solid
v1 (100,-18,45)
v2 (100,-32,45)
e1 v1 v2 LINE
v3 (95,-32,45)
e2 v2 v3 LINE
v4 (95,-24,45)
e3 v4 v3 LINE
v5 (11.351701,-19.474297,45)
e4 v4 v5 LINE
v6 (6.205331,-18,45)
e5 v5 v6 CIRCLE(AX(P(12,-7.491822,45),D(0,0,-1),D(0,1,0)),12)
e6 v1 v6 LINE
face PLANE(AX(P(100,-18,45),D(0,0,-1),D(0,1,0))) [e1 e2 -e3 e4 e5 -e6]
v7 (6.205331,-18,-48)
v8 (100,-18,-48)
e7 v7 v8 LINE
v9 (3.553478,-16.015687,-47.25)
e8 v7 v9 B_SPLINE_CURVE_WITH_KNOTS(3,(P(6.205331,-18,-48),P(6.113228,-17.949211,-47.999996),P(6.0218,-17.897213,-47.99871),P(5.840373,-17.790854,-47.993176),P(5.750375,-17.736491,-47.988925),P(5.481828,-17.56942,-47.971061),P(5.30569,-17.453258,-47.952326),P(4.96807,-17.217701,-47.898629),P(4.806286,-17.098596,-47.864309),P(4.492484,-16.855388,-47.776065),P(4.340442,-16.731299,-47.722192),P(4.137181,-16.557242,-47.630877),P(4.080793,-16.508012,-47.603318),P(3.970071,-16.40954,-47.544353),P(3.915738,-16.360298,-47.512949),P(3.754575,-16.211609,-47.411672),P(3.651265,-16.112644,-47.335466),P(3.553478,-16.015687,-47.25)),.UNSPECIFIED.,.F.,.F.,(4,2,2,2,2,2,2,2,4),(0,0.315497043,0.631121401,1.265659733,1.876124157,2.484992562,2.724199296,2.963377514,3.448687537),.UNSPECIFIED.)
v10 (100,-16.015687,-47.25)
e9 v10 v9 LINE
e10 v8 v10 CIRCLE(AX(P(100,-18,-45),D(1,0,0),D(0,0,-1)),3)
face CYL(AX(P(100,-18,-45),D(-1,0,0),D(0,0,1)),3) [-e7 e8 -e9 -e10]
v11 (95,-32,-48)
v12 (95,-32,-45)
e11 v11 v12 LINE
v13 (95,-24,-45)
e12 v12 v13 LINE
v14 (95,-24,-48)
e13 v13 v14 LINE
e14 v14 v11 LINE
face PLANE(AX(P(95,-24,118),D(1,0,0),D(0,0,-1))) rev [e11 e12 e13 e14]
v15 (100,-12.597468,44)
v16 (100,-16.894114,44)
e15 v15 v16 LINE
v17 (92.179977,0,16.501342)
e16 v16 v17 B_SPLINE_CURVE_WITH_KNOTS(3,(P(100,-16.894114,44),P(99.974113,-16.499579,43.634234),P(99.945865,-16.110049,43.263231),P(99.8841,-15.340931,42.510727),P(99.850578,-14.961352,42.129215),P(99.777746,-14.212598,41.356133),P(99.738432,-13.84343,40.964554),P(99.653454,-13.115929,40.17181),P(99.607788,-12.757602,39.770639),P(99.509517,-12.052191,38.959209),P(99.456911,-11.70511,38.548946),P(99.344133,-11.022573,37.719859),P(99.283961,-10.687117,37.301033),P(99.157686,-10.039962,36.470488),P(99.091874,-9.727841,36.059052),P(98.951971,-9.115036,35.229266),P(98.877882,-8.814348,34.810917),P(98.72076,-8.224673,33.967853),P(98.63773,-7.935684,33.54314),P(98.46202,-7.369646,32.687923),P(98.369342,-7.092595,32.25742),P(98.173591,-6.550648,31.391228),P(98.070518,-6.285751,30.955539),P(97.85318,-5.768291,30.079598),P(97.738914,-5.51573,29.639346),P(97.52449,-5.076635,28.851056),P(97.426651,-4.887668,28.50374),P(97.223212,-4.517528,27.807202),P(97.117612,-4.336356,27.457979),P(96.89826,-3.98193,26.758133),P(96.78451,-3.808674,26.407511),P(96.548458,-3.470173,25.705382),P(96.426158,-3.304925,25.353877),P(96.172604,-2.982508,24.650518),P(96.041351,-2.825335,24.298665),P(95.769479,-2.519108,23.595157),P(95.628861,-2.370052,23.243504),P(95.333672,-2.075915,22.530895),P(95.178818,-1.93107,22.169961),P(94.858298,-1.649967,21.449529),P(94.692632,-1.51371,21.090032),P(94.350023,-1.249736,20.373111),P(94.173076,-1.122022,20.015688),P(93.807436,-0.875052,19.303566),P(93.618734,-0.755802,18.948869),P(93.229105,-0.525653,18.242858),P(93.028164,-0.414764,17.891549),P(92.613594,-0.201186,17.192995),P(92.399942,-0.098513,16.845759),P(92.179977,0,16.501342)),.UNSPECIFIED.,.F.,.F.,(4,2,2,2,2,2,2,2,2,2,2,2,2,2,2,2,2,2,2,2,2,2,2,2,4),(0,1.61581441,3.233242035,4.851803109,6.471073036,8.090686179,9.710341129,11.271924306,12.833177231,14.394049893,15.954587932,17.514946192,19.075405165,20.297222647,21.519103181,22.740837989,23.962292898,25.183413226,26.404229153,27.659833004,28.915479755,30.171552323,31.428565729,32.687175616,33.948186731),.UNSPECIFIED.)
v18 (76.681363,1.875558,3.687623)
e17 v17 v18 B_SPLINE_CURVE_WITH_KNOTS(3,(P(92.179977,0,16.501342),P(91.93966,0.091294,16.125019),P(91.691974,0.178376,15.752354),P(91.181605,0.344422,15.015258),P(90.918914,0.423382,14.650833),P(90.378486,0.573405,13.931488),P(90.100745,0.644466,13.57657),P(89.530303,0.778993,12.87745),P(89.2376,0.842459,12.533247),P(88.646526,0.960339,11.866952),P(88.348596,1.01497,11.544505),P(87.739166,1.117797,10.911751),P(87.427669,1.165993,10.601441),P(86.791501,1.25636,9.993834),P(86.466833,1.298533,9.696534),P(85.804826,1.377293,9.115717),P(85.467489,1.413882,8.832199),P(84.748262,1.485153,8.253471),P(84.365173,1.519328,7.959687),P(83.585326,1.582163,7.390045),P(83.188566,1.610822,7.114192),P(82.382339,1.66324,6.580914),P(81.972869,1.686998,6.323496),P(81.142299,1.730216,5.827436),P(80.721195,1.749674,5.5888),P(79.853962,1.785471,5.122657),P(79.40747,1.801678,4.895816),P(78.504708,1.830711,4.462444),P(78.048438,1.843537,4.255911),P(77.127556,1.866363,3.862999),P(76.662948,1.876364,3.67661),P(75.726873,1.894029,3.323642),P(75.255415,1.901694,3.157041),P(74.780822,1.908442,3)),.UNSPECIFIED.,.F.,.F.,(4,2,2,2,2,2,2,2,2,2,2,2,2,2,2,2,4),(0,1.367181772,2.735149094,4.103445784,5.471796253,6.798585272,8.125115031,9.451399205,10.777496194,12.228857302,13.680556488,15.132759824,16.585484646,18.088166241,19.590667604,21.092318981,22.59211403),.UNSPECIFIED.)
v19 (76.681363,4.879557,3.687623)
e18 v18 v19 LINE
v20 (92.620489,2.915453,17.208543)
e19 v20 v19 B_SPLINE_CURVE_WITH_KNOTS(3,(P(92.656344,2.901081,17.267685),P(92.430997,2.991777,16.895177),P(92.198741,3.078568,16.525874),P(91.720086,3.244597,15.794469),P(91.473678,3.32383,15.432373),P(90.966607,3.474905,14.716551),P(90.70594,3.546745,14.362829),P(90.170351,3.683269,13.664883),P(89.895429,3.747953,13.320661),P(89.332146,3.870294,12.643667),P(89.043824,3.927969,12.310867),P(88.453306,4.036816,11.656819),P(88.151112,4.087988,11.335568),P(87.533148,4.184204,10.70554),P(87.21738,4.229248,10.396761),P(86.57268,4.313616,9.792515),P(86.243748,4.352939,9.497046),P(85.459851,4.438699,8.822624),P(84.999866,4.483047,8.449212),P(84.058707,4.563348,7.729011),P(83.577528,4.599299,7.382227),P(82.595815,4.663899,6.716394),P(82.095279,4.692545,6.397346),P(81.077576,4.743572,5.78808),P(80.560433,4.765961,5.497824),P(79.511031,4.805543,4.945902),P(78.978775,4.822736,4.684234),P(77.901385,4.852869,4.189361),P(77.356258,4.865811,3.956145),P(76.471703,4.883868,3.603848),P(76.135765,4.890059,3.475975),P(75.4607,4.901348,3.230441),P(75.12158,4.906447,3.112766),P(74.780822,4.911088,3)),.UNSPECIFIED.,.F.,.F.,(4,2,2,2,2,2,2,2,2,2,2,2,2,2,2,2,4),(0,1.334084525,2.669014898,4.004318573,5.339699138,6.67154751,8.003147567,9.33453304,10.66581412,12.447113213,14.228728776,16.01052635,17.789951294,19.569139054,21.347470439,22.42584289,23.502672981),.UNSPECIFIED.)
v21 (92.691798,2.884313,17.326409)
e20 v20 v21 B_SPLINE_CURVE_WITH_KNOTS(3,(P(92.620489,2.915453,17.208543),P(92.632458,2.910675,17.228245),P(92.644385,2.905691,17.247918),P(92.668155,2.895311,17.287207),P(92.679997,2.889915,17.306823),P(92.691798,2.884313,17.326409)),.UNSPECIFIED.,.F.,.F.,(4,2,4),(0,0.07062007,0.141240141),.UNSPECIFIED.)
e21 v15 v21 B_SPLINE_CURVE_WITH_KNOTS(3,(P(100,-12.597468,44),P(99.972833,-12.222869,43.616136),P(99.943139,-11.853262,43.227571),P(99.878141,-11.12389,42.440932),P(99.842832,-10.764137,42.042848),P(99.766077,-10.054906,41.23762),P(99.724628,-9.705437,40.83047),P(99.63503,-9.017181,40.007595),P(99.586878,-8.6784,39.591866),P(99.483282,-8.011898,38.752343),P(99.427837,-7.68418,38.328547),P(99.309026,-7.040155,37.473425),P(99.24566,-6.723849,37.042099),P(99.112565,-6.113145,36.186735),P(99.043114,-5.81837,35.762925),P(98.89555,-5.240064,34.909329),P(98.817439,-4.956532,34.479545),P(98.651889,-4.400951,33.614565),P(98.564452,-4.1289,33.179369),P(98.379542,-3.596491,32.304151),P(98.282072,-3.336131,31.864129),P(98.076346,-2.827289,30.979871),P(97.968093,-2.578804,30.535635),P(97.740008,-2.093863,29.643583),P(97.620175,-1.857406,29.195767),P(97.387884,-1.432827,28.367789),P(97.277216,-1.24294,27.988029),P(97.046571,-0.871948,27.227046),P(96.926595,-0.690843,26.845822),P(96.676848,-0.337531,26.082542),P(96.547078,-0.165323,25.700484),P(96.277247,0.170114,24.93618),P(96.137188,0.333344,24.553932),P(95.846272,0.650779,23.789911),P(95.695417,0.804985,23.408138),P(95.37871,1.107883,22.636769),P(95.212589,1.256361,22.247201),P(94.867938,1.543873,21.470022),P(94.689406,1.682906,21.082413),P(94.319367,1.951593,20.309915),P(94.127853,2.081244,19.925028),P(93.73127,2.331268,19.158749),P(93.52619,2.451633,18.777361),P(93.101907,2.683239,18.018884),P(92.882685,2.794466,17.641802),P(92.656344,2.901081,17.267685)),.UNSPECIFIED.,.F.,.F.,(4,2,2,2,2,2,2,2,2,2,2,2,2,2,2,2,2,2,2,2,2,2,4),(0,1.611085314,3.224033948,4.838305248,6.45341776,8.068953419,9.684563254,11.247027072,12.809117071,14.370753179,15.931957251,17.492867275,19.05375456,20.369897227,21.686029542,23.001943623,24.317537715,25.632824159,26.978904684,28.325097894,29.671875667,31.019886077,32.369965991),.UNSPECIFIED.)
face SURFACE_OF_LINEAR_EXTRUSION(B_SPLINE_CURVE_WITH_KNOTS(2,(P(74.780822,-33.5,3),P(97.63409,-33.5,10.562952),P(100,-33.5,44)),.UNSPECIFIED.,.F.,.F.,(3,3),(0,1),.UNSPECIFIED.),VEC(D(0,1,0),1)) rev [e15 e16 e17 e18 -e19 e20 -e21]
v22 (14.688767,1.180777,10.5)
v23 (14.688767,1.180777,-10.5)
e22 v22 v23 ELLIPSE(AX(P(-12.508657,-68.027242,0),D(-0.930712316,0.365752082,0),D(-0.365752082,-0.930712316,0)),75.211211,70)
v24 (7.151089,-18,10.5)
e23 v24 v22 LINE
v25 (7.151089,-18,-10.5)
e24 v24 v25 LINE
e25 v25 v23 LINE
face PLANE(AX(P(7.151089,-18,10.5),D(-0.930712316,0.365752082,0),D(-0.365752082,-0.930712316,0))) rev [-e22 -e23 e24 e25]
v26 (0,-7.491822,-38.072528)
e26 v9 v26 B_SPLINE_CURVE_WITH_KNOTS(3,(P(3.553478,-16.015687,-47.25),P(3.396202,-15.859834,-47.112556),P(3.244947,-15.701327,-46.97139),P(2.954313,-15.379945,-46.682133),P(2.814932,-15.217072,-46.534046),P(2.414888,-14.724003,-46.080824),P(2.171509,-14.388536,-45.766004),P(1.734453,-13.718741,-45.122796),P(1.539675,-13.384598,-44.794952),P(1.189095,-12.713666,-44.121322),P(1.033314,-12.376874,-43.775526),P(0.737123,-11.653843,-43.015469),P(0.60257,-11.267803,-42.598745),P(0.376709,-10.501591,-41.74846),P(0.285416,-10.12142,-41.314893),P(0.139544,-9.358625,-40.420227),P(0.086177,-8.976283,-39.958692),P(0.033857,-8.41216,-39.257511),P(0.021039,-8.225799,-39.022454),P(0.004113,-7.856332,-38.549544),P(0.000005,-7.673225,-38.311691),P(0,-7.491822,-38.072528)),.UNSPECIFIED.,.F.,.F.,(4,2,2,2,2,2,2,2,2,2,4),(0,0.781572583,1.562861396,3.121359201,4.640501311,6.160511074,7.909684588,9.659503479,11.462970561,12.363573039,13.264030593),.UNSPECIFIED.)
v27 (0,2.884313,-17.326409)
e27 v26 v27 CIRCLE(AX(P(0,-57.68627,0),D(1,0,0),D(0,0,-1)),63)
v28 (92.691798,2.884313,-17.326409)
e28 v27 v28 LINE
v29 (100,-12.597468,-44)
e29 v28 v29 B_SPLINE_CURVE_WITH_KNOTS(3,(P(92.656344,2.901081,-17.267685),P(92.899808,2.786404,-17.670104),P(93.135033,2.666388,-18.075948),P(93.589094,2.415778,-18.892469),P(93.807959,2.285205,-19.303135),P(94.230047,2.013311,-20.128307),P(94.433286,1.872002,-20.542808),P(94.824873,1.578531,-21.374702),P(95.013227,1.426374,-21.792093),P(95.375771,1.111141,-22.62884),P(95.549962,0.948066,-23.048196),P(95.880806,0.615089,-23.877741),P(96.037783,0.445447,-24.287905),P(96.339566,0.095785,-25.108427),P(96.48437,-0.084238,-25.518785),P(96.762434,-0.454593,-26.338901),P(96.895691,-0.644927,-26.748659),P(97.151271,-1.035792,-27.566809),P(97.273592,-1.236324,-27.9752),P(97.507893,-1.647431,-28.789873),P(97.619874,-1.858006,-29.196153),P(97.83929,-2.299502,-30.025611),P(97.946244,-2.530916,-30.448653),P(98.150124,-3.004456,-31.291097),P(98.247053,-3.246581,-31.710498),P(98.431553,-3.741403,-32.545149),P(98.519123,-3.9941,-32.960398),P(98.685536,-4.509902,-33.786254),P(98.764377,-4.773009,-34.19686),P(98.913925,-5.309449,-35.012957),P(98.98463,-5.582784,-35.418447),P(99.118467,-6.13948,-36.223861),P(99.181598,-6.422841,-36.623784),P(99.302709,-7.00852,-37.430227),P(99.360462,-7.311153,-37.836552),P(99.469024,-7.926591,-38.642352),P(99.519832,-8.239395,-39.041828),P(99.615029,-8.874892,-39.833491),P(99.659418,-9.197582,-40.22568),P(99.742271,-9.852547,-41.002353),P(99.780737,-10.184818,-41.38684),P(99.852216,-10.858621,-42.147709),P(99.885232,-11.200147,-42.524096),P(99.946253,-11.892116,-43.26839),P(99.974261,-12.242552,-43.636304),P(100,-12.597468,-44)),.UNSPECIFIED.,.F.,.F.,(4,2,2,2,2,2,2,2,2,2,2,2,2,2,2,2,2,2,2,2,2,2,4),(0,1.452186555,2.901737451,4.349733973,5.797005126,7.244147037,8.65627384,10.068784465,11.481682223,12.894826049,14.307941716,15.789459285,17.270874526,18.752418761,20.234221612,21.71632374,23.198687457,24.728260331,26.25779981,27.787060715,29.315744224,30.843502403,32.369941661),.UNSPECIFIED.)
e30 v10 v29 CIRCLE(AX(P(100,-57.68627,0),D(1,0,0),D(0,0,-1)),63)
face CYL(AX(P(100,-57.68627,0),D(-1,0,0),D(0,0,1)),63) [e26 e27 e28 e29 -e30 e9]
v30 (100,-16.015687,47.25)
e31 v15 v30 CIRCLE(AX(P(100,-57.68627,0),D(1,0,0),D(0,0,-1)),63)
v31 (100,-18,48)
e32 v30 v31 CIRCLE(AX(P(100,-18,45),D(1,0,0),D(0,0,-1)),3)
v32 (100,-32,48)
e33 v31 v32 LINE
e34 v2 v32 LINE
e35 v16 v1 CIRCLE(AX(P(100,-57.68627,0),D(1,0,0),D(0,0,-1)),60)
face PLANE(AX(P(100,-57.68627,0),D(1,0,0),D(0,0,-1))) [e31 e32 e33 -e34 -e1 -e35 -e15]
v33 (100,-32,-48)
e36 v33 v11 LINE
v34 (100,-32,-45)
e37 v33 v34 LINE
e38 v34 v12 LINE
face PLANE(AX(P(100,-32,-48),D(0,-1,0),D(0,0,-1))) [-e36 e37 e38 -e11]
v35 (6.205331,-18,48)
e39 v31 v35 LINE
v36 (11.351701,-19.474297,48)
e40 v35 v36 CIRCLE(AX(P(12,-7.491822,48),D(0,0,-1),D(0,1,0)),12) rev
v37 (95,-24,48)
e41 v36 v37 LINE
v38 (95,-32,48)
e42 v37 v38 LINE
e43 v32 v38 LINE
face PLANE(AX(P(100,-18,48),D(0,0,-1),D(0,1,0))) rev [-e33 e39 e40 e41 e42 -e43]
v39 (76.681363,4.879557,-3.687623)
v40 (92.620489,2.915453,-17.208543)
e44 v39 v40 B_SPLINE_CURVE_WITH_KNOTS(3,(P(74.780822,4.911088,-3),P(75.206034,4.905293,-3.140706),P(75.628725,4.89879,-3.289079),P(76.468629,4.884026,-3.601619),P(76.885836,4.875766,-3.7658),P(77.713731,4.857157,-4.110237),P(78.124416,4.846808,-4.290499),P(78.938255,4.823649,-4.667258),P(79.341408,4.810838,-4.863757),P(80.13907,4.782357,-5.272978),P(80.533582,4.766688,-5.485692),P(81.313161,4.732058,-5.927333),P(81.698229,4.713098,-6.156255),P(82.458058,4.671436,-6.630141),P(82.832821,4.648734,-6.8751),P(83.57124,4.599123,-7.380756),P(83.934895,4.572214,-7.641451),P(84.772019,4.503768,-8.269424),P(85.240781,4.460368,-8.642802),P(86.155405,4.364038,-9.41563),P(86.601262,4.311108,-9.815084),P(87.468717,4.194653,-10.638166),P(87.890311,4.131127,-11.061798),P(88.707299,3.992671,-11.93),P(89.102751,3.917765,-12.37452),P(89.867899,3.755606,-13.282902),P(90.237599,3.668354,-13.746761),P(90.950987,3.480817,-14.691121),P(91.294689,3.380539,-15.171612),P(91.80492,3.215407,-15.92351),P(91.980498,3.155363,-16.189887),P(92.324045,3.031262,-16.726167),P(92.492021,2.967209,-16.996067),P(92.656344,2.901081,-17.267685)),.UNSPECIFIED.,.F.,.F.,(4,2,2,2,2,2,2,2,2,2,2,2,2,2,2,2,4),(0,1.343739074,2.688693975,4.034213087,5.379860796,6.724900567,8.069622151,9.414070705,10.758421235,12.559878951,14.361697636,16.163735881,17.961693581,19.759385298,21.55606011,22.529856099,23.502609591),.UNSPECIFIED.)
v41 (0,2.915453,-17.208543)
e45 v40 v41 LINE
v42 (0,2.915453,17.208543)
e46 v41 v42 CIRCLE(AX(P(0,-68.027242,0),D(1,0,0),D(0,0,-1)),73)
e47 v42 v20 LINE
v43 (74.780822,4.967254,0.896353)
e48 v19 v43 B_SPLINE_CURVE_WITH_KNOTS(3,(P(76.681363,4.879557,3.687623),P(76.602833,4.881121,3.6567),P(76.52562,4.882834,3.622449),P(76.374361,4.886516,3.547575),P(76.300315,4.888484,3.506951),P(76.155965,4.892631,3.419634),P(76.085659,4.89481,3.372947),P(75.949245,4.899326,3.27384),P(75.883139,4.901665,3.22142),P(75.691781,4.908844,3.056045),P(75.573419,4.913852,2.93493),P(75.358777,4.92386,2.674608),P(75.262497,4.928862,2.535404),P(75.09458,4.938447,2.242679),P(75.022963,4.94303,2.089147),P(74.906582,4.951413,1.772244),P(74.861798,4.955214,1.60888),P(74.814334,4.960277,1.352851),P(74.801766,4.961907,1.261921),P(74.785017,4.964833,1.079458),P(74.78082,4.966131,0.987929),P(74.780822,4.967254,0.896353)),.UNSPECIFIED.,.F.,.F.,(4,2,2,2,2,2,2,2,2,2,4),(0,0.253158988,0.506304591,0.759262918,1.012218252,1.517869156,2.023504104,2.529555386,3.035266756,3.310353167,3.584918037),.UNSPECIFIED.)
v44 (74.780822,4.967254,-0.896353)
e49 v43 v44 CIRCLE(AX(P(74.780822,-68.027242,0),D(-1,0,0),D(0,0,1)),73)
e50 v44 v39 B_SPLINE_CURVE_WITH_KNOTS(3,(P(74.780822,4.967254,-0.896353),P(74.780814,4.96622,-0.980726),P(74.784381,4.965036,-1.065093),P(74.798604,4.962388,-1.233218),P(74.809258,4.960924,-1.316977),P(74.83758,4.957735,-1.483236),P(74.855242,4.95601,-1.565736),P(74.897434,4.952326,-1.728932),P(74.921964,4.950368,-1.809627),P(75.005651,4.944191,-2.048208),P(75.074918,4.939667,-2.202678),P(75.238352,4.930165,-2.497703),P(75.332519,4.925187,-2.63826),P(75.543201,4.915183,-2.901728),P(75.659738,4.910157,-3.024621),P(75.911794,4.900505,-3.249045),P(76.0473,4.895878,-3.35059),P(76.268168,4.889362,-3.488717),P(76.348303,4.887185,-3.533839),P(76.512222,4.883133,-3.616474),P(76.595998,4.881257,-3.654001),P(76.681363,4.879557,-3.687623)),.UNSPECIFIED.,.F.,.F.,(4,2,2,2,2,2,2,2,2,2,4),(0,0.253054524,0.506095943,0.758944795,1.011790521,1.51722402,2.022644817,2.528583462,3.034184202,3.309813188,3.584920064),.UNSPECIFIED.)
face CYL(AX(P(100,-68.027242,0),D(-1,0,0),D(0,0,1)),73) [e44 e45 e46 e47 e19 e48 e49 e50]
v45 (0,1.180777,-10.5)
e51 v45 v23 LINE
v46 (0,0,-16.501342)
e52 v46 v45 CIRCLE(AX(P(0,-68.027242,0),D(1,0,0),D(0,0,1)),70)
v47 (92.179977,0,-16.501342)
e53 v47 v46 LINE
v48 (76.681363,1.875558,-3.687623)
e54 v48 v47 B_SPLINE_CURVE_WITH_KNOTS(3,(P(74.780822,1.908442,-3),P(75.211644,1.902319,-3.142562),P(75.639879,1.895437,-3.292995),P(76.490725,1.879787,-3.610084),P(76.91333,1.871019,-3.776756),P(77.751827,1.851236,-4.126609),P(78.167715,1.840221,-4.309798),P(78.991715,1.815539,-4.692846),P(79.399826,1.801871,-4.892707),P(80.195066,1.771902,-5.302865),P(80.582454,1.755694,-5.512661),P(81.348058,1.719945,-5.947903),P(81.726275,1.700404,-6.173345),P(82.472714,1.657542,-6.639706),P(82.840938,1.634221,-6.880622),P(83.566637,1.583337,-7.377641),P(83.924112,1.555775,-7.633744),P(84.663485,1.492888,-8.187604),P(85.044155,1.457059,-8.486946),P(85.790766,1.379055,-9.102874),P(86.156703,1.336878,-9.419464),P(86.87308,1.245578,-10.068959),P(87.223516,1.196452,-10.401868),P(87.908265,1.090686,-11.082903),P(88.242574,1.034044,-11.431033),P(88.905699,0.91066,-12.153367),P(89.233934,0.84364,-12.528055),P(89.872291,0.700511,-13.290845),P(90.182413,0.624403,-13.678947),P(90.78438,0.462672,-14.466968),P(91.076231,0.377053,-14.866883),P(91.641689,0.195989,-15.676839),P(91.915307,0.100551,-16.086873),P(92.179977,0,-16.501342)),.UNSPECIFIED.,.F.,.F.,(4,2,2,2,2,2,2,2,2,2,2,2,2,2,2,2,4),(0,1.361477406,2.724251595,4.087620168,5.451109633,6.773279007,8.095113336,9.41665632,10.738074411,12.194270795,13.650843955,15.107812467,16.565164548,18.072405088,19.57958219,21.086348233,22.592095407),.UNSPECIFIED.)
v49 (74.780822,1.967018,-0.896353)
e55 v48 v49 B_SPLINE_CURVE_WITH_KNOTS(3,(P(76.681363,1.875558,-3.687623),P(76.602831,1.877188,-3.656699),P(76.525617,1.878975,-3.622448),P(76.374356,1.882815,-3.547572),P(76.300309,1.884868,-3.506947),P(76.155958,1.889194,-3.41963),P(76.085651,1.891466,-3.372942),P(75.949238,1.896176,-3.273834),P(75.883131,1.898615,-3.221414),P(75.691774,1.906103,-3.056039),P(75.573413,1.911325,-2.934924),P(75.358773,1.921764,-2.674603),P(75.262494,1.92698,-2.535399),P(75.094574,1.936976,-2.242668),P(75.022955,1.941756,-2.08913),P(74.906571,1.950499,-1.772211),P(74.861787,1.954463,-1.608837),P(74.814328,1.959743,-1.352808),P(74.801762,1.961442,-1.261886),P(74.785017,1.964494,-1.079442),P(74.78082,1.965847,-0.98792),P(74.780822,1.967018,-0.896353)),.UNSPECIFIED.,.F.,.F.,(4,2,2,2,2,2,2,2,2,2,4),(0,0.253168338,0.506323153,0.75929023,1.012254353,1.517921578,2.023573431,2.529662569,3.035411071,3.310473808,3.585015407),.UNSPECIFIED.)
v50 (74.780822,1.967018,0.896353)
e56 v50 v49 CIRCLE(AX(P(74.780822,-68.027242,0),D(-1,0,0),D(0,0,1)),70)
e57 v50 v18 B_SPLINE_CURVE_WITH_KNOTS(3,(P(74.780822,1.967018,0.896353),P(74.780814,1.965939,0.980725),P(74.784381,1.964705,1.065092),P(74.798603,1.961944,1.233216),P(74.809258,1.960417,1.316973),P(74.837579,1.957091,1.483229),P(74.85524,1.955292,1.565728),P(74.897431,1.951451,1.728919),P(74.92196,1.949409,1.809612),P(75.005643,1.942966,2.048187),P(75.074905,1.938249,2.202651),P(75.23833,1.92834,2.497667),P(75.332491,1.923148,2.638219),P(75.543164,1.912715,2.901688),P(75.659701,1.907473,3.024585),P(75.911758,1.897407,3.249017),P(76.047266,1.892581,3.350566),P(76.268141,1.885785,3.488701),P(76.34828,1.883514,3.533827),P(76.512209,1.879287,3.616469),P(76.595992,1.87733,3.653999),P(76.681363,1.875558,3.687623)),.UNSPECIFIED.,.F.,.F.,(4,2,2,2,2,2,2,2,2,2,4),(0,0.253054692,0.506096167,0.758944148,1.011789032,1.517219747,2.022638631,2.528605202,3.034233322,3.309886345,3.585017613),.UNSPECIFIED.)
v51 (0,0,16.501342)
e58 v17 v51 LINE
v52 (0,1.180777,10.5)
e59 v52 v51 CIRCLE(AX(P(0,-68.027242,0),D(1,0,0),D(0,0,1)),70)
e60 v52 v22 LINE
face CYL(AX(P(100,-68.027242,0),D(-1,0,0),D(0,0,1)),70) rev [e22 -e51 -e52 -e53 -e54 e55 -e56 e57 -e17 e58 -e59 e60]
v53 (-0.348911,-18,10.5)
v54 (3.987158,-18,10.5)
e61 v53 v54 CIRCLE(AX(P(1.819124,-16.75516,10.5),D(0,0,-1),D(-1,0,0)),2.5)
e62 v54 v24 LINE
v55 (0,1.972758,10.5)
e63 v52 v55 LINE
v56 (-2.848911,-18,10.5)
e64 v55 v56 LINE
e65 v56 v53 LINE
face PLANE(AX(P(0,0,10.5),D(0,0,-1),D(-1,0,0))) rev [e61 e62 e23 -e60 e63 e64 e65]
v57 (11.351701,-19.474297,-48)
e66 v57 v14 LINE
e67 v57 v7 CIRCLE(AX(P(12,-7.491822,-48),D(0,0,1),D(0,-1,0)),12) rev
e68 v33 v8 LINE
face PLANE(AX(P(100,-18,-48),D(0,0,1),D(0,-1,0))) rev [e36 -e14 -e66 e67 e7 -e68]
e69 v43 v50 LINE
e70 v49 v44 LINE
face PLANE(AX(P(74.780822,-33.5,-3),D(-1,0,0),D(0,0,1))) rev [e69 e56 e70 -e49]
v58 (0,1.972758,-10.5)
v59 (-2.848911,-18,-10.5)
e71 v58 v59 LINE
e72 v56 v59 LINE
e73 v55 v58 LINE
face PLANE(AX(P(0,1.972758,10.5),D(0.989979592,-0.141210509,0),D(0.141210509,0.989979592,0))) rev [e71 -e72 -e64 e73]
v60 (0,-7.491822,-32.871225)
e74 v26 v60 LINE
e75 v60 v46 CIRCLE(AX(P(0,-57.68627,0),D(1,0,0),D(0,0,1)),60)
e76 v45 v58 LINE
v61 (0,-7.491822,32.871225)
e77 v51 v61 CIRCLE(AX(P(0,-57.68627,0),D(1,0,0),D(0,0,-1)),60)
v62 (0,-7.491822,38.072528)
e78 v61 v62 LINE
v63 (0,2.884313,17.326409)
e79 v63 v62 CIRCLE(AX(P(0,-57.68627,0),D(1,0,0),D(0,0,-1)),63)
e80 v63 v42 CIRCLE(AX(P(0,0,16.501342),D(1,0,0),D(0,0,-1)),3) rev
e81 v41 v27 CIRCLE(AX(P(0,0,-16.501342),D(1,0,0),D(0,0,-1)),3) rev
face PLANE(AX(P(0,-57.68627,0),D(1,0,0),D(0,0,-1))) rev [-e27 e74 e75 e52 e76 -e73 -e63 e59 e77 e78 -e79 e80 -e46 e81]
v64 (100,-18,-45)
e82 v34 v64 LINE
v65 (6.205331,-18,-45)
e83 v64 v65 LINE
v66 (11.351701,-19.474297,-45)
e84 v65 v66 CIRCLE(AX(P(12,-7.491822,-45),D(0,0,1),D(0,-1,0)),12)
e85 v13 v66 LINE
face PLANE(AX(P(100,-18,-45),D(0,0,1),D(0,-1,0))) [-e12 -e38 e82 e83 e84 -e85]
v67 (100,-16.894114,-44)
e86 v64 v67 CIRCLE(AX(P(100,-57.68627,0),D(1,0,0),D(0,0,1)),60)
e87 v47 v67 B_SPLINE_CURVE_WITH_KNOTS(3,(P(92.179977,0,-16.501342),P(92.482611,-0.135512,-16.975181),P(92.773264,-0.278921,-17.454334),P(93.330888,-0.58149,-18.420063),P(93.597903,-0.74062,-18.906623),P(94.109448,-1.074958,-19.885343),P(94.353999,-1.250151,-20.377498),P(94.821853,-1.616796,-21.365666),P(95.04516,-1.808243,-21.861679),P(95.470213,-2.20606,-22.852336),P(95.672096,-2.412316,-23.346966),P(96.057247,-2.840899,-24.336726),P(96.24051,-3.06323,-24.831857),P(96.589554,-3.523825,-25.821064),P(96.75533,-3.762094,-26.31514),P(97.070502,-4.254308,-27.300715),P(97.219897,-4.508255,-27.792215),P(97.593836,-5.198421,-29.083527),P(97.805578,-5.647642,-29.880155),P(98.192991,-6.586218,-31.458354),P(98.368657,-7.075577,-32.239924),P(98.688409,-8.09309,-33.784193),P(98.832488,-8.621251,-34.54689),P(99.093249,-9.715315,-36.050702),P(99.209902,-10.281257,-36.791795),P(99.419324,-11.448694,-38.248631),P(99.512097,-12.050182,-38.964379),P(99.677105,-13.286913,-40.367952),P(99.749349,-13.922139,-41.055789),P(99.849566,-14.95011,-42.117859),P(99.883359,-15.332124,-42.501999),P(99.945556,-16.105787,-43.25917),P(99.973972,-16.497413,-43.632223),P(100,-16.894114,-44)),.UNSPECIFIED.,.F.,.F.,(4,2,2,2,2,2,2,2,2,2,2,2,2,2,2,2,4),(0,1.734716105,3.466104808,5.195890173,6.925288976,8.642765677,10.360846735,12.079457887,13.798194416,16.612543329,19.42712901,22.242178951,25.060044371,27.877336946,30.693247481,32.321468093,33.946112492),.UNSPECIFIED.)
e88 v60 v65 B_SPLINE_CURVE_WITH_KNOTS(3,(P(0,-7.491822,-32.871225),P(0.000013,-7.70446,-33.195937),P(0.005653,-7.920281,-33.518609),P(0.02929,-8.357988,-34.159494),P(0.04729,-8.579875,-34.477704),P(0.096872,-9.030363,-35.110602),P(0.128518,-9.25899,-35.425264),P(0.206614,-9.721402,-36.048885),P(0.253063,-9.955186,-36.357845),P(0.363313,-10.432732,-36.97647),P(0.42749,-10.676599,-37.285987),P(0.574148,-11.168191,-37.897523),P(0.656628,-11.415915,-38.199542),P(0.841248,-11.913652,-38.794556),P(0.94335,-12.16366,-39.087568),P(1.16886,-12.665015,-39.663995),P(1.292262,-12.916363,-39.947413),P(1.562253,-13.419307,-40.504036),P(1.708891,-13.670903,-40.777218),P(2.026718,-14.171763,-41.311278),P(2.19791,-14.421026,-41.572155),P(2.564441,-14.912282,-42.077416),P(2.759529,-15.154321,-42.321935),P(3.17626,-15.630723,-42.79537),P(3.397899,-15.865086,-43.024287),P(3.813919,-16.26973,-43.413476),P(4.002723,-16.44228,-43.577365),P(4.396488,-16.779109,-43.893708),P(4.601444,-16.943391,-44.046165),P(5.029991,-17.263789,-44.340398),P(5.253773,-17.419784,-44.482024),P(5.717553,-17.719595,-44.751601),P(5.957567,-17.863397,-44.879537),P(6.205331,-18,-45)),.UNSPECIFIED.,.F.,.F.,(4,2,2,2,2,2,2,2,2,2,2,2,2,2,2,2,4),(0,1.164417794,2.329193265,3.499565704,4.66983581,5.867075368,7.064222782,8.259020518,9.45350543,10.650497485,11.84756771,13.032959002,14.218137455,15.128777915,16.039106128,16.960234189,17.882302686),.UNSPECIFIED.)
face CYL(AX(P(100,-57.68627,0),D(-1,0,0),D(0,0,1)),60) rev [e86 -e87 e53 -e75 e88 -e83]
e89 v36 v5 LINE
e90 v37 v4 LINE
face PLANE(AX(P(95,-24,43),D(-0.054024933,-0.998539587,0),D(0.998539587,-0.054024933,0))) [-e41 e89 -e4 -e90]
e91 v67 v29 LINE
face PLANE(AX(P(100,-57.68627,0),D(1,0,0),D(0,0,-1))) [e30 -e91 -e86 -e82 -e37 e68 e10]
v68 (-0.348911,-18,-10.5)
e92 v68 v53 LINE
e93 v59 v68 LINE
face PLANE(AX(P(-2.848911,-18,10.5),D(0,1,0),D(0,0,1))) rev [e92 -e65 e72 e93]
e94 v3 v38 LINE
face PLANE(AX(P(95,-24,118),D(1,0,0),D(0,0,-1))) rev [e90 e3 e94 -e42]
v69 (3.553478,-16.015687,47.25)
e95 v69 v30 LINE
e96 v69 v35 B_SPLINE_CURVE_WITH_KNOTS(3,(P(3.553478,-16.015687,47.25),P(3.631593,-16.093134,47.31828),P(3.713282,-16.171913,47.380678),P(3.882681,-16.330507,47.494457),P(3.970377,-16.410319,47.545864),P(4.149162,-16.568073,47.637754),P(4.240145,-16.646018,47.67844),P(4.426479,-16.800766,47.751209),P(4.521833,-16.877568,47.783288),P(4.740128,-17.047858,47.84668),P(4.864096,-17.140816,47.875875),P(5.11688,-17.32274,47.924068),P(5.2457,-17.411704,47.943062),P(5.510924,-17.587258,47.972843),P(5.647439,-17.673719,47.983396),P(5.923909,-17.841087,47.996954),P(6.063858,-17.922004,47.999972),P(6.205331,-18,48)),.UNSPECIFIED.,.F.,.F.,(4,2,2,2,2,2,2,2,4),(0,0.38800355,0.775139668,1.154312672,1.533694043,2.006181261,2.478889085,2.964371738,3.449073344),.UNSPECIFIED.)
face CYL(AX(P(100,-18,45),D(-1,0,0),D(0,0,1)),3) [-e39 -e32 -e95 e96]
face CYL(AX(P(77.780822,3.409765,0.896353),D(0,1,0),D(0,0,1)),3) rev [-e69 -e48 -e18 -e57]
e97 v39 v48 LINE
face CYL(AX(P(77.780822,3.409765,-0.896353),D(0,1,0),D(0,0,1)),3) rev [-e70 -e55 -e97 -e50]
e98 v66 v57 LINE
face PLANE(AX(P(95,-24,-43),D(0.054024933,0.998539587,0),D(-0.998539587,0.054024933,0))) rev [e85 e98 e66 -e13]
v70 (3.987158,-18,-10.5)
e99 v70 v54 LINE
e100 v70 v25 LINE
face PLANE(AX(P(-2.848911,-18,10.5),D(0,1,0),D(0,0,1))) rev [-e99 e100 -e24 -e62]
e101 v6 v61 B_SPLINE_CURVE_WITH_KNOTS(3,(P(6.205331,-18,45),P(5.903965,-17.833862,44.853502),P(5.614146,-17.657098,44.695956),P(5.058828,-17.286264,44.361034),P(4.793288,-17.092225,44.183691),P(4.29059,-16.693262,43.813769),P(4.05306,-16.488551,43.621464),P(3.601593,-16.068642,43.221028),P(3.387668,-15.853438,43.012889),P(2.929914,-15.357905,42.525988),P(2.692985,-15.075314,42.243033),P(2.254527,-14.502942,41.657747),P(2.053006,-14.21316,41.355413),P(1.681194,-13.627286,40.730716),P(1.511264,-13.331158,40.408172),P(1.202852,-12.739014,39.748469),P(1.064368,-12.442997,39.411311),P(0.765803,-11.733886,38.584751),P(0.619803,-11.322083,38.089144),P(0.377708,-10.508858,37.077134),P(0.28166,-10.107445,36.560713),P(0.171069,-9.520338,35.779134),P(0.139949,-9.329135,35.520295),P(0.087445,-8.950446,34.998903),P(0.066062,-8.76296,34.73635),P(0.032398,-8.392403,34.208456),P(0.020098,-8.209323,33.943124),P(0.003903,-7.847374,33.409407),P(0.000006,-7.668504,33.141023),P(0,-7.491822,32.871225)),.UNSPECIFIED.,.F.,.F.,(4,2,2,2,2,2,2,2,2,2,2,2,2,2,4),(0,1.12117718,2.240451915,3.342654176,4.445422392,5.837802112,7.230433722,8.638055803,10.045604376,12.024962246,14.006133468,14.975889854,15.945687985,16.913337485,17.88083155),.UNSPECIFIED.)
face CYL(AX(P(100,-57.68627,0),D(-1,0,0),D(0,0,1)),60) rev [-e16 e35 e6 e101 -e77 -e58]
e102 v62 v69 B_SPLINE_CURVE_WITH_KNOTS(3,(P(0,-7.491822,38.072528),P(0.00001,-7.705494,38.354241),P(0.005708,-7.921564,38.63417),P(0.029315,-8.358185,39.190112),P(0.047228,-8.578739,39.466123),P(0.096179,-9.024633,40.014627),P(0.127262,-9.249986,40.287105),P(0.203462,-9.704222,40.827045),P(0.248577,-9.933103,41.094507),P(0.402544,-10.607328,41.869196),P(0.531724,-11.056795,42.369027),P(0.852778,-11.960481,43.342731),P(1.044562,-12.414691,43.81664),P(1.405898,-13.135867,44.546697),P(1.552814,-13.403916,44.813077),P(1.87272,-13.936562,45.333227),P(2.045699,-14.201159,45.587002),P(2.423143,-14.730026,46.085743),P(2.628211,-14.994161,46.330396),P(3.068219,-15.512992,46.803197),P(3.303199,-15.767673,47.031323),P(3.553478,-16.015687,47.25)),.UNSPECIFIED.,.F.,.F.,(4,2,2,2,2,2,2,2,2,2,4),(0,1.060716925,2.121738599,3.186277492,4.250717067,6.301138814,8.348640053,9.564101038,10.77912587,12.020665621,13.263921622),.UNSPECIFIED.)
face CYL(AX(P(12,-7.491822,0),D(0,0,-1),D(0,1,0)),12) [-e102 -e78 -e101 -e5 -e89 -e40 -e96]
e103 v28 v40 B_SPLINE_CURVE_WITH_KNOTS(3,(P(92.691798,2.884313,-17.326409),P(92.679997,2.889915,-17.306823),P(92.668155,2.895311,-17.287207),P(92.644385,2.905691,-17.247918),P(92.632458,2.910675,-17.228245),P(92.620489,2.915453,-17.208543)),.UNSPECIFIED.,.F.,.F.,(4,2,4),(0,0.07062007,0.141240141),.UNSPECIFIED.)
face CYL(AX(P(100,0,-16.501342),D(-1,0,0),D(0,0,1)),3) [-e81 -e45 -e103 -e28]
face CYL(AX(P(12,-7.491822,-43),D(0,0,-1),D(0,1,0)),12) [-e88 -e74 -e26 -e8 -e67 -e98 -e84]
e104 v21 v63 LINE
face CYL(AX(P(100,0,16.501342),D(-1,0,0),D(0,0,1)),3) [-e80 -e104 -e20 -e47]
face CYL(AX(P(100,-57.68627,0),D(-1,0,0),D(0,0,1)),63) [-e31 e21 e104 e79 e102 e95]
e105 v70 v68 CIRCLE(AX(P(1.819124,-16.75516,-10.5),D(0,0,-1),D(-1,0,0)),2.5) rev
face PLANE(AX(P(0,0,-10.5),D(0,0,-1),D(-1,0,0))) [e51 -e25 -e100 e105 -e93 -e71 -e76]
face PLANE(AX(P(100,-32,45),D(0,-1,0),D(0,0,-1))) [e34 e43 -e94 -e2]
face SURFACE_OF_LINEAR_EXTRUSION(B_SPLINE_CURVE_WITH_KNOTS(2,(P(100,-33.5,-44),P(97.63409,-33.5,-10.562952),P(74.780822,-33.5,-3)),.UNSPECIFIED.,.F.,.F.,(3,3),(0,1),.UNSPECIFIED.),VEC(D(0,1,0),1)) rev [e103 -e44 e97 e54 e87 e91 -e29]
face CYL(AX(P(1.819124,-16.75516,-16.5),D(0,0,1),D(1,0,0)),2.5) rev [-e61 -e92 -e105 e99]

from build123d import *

# Parameters (mm, degrees)
EXTRUDE_THIN1_DEPTH = 100
CUT_EXTRUDE2_DEPTH  = 33.5
FILLET1_R           = 3
SKETCH6_W           = 108.670856817
SKETCH6_H           = 17.879774232
CUT_EXTRUDE3_DEPTH  = 166
BOSS_EXTRUDE1_DEPTH = 10.5
CUT_EXTRUDE4_DEPTH  = 27
CUT_EXTRUDE7_DEPTH  = 5
FILLET5_R           = 12


with BuildPart() as part:
    # Sketch1 → Extrude-Thin1 (new body)
    with BuildSketch(Plane(origin=(0, 0, 0), x_dir=(0, 0, -1), z_dir=(1, 0, 0))):
        with BuildLine():
            Line((45, -32), (45, -18))
            ThreePointArc((45, -18), (32.040658091, -6.957616726), (16.501342128, 0))
            ThreePointArc((16.501342128, 0), (0, 1.972757604), (-16.501342128, 0))
            ThreePointArc((-16.501342128, 0), (-32.040658091, -6.957616726), (-45, -18))
            Line((-45, -18), (-45, -32))
            Line((-45, -32), (-48, -32))
            Line((-48, -32), (-48, -16.88185814))
            ThreePointArc((-48, -16.88185814), (-34.099982932, -4.712774746), (-17.26768466, 2.901081048))
            ThreePointArc((-17.26768466, 2.901081048), (0, 4.972757604), (17.26768466, 2.901081048))
            ThreePointArc((17.26768466, 2.901081048), (34.099982932, -4.712774746), (48, -16.88185814))
            Line((48, -16.88185814), (48, -32))
            Line((48, -32), (45, -32))
        make_face()
    extrude(amount=EXTRUDE_THIN1_DEPTH)

    # Sketch5 → Cut-Extrude2 (cut, symmetric)
    with BuildSketch(Plane(origin=(0, 0, 0), x_dir=(1, 0, 0), z_dir=(0, 1, 0))):
        with BuildLine():
            Line((74.78082212, 3), (74.78082212, -3))
            add(Edge.make_bspline(
                [(74.78082212, -3), (97.634090292, -10.562952057), (100, -44)],
                knots=[0, 0, 0, 1, 1, 1], degree=2))
            Line((100, -44), (100, 44))
            add(Edge.make_bspline(
                [(74.78082212, 3), (97.634090292, 10.562952057), (100, 44)],
                knots=[0, 0, 0, 1, 1, 1], degree=2))
        make_face()
    extrude(amount=CUT_EXTRUDE2_DEPTH, both=True, mode=Mode.SUBTRACT)

    # Fillet1
    fillet1_edges = [part.edges().sort_by_distance(p)[0] for p in [
        (50, -16.88185814, -48),
        (50, -16.88185814, 48),
        (74.78082212, 3.409765032, 3),
        (74.78082212, 3.409765032, -3),
        (46.328171757, 2.901081048, -17.26768466),
        (46.328171757, 2.901081048, 17.26768466),
    ]]
    fillet(fillet1_edges, radius=FILLET1_R)

    # Sketch6 → Cut-Extrude3 (cut)
    with BuildSketch(Plane(origin=(0, 0, -48), x_dir=(-1, 0, 0), z_dir=(0, 0, -1))):
        with Locations((-40.664571591, -32.939887116)):
            Rectangle(SKETCH6_W, SKETCH6_H)
    extrude(amount=-CUT_EXTRUDE3_DEPTH, mode=Mode.SUBTRACT)

    # Sketch8 → Boss-Extrude1 (add, symmetric)
    with BuildSketch(Plane.XY):
        Polygon((0, 1.972757604), (-2.848910504, -18), (7.151089496, -18), (15, 1.972757604), align=None)
    extrude(amount=BOSS_EXTRUDE1_DEPTH, both=True)

    # Sketch10 → Cut-Extrude4 (cut)
    with BuildSketch(Plane.XY.offset(10.5)):
        with BuildLine():
            Line((-0.348910504, -18), (3.987157996, -18))
            ThreePointArc((3.987157996, -18), (1.819123746, -14.255159652), (-0.348910504, -18))
        make_face()
    extrude(amount=-CUT_EXTRUDE4_DEPTH, mode=Mode.SUBTRACT)

    # Sketch15 → Cut-Extrude7 (cut)
    with BuildSketch(Plane(origin=(0, 0, -48), x_dir=(-1, 0, 0), z_dir=(0, 0, -1))):
        Polygon((-95, -24), (0, -18.860125055), (0, -26.57204687), align=None)
    cut_extrude7 = extrude(amount=-CUT_EXTRUDE7_DEPTH, mode=Mode.SUBTRACT)

    # Mirror2: Cut-Extrude7 across plane
    add(cut_extrude7.mirror(Plane.XY), mode=Mode.SUBTRACT)

    # Fillet5
    # the kernel refuses this fillet: 12 mm, written as the material it takes off along each edge
    with BuildSketch(Plane(origin=(0, -18.860125055, 76.420758066), x_dir=(0, 1, 0), z_dir=(0, 0, -1))) as fillet5_piece_1:
        with BuildLine():
            CenterArc((FILLET5_R * 0.947358602211, FILLET5_R), FILLET5_R, 183.096908366, 86.903091634)
            Line((-FILLET5_R * 0.0511809847104, FILLET5_R * 0.945975067318), (0, 0))
            Line((0, 0), (FILLET5_R * 0.947358602211, 0))
        make_face()
    extrude(amount=59.841516133, mode=Mode.SUBTRACT)
    with BuildSketch(Plane(origin=(0, -18.860125055, -76.420758066), x_dir=(0, 1, 0), z_dir=(0, 0, 1))) as fillet5_piece_2:
        with BuildLine():
            CenterArc((FILLET5_R * 0.947358602211, -FILLET5_R), FILLET5_R, 90, 86.903091634)
            Line((-FILLET5_R * 0.0511809847104, -FILLET5_R * 0.945975067318), (0, 0))
            Line((0, 0), (FILLET5_R * 0.947358602211, 0))
        make_face()
    extrude(amount=59.841516133, mode=Mode.SUBTRACT)


solid = part.part
